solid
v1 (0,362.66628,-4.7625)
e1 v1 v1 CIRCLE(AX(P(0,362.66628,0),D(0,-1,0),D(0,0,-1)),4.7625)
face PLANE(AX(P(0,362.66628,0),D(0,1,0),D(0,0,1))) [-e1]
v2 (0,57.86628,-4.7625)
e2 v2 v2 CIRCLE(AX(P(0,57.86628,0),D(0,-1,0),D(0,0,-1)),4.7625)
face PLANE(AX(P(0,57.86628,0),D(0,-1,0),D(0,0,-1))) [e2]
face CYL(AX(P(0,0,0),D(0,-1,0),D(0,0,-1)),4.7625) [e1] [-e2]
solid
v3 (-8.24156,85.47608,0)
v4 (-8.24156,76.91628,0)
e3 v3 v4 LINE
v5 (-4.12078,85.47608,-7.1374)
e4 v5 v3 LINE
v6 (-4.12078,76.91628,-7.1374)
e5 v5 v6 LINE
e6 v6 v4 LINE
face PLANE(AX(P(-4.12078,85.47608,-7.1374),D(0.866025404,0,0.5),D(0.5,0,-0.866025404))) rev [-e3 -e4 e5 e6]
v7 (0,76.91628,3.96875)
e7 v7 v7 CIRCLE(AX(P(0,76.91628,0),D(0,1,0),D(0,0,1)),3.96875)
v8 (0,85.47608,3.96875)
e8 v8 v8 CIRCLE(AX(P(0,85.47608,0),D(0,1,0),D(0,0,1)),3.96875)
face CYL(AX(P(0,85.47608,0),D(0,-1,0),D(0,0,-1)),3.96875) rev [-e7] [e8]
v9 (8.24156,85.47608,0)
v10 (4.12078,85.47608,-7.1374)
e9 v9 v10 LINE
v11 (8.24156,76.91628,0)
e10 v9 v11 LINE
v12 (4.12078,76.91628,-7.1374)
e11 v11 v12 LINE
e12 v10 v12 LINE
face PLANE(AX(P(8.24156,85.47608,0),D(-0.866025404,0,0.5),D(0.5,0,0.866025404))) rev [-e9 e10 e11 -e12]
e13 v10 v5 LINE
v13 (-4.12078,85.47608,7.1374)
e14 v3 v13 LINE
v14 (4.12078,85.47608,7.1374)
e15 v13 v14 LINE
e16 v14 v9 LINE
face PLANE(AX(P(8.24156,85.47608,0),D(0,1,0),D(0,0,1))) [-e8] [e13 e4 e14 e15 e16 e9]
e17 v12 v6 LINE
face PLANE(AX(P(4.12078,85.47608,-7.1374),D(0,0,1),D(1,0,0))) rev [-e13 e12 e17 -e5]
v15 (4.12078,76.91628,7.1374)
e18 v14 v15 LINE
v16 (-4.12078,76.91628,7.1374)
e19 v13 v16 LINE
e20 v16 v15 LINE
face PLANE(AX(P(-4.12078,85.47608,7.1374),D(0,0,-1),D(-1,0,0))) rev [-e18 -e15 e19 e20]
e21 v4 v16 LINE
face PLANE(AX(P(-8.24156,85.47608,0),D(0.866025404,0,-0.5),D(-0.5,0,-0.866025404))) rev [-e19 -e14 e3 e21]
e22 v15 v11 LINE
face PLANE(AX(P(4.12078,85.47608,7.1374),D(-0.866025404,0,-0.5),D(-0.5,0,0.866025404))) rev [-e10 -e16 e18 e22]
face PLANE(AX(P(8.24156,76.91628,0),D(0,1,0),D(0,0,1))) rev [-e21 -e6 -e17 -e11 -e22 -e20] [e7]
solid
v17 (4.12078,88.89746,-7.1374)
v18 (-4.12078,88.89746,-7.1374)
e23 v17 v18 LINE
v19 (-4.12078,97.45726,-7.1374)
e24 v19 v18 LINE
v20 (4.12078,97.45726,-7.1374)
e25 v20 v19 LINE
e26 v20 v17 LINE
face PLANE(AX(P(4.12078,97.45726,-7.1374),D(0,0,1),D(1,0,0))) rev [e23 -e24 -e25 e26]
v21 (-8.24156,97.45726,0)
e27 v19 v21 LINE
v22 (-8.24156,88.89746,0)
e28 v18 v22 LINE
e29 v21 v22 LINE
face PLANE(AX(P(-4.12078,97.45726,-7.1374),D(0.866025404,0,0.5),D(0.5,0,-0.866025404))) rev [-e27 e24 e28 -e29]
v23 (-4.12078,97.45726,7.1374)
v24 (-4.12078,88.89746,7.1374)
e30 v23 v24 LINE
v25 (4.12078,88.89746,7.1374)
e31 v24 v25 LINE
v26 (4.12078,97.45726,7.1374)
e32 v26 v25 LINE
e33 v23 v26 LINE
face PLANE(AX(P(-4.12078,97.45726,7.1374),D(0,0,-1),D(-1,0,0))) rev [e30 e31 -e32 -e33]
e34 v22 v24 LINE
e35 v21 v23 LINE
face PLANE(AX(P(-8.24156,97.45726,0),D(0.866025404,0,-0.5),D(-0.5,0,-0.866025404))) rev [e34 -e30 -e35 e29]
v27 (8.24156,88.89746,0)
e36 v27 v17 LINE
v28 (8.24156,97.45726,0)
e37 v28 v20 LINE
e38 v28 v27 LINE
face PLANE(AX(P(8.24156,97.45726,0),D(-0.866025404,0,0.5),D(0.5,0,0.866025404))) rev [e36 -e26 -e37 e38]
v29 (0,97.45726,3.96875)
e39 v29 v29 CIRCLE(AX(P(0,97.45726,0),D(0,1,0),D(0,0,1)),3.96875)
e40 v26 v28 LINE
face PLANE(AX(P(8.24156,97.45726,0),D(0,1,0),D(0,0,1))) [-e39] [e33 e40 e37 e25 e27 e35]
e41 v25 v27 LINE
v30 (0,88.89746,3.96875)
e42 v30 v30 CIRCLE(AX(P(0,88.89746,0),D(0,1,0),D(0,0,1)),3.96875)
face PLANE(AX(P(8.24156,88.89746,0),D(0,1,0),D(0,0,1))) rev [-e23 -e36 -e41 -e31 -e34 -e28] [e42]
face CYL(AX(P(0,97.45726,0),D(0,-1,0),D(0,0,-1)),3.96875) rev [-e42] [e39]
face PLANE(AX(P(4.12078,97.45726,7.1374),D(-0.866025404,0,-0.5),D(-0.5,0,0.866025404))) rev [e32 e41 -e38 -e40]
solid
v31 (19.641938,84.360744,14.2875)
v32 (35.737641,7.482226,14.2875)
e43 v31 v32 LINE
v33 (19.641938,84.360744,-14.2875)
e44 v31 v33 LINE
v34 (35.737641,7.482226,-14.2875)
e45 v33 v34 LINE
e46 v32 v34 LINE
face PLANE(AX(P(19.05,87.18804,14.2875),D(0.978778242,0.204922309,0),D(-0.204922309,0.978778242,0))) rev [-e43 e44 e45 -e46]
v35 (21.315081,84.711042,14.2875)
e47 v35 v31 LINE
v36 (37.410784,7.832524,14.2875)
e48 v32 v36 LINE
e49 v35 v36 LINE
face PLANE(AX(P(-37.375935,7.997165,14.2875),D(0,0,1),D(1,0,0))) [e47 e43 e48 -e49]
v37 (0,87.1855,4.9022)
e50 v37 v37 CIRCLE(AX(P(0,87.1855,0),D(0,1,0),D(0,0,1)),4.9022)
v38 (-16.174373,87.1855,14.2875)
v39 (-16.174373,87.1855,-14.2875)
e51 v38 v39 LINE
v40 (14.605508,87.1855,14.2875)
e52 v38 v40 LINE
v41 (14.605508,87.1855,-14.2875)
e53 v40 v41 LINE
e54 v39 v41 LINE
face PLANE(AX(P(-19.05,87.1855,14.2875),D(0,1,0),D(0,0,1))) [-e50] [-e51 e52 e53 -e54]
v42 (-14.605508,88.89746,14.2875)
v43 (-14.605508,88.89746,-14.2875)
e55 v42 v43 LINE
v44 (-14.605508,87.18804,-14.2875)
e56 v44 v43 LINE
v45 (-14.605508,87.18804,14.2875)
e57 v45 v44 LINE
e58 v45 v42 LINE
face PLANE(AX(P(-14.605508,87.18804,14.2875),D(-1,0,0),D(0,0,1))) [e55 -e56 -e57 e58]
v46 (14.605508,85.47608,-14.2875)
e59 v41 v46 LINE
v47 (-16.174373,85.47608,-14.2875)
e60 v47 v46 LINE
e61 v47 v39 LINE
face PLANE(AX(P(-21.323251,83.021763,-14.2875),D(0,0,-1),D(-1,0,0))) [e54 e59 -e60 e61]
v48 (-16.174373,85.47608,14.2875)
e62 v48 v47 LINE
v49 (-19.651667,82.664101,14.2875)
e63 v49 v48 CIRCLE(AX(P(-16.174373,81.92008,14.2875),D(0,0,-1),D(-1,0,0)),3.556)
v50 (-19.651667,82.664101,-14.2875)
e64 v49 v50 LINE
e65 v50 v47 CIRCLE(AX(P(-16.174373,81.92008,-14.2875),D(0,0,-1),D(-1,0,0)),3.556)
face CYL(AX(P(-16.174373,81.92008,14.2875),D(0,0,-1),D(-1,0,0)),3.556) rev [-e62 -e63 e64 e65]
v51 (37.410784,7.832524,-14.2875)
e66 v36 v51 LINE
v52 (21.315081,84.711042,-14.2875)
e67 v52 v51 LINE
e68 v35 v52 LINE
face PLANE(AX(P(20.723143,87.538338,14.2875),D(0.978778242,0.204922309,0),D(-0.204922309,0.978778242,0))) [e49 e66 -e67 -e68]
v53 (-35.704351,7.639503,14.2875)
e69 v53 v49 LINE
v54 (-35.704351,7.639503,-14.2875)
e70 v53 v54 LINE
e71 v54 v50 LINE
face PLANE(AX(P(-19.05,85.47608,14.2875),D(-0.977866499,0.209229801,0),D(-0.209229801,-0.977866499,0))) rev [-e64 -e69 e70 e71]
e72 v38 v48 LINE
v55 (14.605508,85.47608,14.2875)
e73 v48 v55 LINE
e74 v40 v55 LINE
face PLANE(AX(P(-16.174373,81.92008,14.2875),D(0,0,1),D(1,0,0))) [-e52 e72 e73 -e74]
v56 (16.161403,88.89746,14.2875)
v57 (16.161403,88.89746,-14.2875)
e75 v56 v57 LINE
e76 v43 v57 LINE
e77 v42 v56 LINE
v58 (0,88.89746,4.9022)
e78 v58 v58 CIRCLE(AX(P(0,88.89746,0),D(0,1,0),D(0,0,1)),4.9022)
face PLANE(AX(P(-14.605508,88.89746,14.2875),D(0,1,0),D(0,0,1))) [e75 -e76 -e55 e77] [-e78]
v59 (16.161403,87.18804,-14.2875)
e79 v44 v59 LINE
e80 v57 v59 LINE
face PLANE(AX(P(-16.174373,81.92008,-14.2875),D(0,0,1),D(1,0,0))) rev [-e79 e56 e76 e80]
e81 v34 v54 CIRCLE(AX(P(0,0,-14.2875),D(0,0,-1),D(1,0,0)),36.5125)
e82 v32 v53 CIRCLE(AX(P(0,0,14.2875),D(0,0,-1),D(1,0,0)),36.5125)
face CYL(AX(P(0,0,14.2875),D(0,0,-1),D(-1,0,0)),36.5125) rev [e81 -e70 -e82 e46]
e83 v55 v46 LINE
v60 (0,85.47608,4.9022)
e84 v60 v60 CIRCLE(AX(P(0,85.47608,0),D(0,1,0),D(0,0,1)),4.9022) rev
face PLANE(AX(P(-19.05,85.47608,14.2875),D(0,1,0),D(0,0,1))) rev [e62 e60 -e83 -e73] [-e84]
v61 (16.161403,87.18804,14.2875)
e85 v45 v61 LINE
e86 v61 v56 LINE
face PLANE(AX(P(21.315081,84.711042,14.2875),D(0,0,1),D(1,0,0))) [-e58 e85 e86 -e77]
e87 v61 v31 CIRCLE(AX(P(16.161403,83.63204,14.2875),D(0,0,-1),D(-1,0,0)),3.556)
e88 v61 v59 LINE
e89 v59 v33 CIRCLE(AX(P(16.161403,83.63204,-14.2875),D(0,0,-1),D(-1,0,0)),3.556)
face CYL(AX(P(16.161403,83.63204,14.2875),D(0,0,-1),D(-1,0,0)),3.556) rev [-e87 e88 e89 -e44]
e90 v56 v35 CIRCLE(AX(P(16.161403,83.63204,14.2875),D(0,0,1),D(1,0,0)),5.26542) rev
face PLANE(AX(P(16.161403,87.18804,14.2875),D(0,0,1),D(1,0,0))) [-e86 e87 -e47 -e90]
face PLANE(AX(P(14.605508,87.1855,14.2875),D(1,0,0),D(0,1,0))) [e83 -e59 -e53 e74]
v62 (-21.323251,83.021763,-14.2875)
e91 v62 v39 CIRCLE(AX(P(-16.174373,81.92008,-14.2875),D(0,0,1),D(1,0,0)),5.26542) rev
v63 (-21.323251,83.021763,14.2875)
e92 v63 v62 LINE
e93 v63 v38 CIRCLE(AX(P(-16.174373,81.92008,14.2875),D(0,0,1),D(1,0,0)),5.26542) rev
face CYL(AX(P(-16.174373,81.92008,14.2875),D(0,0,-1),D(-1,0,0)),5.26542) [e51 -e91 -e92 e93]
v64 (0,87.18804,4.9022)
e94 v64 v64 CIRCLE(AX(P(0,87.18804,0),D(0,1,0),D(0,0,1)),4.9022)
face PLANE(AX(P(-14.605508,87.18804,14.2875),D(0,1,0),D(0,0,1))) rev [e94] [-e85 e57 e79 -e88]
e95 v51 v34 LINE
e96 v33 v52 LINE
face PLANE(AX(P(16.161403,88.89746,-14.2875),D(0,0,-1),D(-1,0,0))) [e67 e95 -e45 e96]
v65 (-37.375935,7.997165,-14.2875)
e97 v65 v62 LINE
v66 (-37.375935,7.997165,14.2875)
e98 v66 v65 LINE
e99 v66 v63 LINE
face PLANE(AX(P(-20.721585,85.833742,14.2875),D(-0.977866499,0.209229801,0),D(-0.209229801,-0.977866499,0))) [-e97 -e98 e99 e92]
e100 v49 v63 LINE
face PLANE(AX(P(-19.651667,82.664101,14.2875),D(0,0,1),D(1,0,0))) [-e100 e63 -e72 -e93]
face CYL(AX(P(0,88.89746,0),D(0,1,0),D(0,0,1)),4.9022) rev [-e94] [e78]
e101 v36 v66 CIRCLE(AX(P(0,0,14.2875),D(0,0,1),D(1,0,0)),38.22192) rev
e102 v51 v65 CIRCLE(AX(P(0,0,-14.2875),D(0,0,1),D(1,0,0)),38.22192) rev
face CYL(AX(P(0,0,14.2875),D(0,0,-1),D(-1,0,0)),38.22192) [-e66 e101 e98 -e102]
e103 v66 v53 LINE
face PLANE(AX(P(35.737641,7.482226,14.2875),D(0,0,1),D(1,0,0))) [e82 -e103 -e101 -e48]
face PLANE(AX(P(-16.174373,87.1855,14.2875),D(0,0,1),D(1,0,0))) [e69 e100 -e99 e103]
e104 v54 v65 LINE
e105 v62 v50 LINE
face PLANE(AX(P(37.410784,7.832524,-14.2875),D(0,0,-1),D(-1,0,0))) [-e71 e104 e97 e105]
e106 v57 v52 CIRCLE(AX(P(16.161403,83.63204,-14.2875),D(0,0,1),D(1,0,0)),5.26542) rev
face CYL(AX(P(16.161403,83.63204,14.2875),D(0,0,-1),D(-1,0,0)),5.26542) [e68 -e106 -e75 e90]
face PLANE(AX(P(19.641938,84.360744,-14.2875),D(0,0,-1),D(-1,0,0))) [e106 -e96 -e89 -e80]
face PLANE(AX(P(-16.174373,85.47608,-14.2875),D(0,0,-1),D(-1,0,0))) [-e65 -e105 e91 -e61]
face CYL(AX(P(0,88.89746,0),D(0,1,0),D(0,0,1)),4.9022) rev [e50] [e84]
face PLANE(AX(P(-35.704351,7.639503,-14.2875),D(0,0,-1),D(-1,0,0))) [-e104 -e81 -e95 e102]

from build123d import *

# Parameters (mm, degrees)
BASE_FLANGE1_DEPTH              = 14.2875
F_1_2_START                     = 85.47608
F_1_2_CLEARANCE_HOLE2_OUTLINE_R = 4.9022
F_1_2_CLEARANCE_HOLE2_DEPTH     = 3.42138
NUT_SKETCH_R                    = 3.96875
NUT_DEPTH                       = 8.5598
ROD_SKETCH_W                    = 4.7625
ROD_SKETCH_H                    = 304.8


with BuildPart() as part:
    # Base-Flange1: sheet metal written as solids
    # Sketch1 → Base-Flange1 (new, symmetric)
    with BuildSketch(Plane.XY):
        with BuildLine():
            Line((-14.605508, 87.18804), (16.161402617, 87.18804))
            ThreePointArc((16.161402617, 87.18804), (18.403484856, 86.392149279), (19.641938046, 84.360743731))
            Line((19.641938046, 84.360743731), (35.737640565, 7.482225813))
            ThreePointArc((35.737640565, 7.482225813), (-0.080380921, -36.512411522), (-35.704350556, 7.6395031))
            Line((-35.704350556, 7.6395031), (-19.651666762, 82.664101172))
            ThreePointArc((-19.651666762, 82.664101172), (-18.410374017, 84.685118452), (-16.17437349, 85.47608))
            Line((-16.17437349, 85.47608), (14.605508, 85.47608))
            Line((14.605508, 85.47608), (14.605508, 87.1855))
            Line((14.605508, 87.1855), (-16.17437349, 87.1855))
            ThreePointArc((-16.17437349, 87.1855), (-19.485251413, 86.014311937), (-21.323251313, 83.021762778))
            Line((-21.323251313, 83.021762778), (-37.375935107, 7.997164706))
            ThreePointArc((-37.375935107, 7.997164706), (-0.084144146, -38.22182738), (37.410783667, 7.832524107))
            Line((37.410783667, 7.832524107), (21.315081149, 84.711042025))
            ThreePointArc((21.315081149, 84.711042025), (19.481285818, 87.71897324), (16.161402617, 88.89746))
            Line((16.161402617, 88.89746), (-14.605508, 88.89746))
            Line((-14.605508, 88.89746), (-14.605508, 87.18804))
        make_face()
    extrude(amount=BASE_FLANGE1_DEPTH, both=True)

    # 1/2 Clearance Hole2: read off the stored shape, not the designer's step
    # 1/2 Clearance Hole2 outline → 1/2 Clearance Hole2 (cut)
    with BuildSketch(Plane(origin=(0, 0, 0), x_dir=(1, 0, 0), z_dir=(0, 1, 0)).offset(F_1_2_START)):
        Circle(F_1_2_CLEARANCE_HOLE2_OUTLINE_R)
    extrude(amount=F_1_2_CLEARANCE_HOLE2_DEPTH, mode=Mode.SUBTRACT)


with BuildPart() as body_2:
    # Nut_Sketch → Nut (new body)
    with BuildSketch(Plane(origin=(0, 88.89746, 0), x_dir=(1, 0, 0), z_dir=(0, 1, 0))):
        Polygon((8.241559623, 0), (4.120779811, 7.1374), (-4.120779811, 7.1374), (-8.241559623, 0), (-4.120779811, -7.1374), (4.120779811, -7.1374), align=None)
        with Locations(Location((0, 0, 0), (0, 0, 270))):
            Circle(NUT_SKETCH_R, mode=Mode.SUBTRACT)
    extrude(amount=NUT_DEPTH)


with BuildPart() as body_3:
    # Body-Move/Copy1: copy of body 2
    add(body_2.part.moved(Location((0, -32.460651761, 0))))


with BuildPart() as body_3_1:
    # Body-Move/Copy2: read off the stored shape, not the designer's step
    # Body-Move/Copy2: moved
    add(body_3.part.moved(Location((0, 20.4794718, 0))))


with BuildPart() as body_4:
    # Rod_Sketch → Rod (revolve)
    with BuildSketch(Plane.XY, mode=Mode.PRIVATE) as rod_sk:
        with Locations((2.38125, 210.26628)):
            Rectangle(ROD_SKETCH_W, ROD_SKETCH_H)
    revolve(rod_sk.sketch.rotate(Axis((0, 0, 0), (0, 1, 0)), 270), axis=Axis((0, 0, 0), (0, 1, 0)))


solid = Compound([part.part, body_2.part, body_3_1.part, body_4.part])
